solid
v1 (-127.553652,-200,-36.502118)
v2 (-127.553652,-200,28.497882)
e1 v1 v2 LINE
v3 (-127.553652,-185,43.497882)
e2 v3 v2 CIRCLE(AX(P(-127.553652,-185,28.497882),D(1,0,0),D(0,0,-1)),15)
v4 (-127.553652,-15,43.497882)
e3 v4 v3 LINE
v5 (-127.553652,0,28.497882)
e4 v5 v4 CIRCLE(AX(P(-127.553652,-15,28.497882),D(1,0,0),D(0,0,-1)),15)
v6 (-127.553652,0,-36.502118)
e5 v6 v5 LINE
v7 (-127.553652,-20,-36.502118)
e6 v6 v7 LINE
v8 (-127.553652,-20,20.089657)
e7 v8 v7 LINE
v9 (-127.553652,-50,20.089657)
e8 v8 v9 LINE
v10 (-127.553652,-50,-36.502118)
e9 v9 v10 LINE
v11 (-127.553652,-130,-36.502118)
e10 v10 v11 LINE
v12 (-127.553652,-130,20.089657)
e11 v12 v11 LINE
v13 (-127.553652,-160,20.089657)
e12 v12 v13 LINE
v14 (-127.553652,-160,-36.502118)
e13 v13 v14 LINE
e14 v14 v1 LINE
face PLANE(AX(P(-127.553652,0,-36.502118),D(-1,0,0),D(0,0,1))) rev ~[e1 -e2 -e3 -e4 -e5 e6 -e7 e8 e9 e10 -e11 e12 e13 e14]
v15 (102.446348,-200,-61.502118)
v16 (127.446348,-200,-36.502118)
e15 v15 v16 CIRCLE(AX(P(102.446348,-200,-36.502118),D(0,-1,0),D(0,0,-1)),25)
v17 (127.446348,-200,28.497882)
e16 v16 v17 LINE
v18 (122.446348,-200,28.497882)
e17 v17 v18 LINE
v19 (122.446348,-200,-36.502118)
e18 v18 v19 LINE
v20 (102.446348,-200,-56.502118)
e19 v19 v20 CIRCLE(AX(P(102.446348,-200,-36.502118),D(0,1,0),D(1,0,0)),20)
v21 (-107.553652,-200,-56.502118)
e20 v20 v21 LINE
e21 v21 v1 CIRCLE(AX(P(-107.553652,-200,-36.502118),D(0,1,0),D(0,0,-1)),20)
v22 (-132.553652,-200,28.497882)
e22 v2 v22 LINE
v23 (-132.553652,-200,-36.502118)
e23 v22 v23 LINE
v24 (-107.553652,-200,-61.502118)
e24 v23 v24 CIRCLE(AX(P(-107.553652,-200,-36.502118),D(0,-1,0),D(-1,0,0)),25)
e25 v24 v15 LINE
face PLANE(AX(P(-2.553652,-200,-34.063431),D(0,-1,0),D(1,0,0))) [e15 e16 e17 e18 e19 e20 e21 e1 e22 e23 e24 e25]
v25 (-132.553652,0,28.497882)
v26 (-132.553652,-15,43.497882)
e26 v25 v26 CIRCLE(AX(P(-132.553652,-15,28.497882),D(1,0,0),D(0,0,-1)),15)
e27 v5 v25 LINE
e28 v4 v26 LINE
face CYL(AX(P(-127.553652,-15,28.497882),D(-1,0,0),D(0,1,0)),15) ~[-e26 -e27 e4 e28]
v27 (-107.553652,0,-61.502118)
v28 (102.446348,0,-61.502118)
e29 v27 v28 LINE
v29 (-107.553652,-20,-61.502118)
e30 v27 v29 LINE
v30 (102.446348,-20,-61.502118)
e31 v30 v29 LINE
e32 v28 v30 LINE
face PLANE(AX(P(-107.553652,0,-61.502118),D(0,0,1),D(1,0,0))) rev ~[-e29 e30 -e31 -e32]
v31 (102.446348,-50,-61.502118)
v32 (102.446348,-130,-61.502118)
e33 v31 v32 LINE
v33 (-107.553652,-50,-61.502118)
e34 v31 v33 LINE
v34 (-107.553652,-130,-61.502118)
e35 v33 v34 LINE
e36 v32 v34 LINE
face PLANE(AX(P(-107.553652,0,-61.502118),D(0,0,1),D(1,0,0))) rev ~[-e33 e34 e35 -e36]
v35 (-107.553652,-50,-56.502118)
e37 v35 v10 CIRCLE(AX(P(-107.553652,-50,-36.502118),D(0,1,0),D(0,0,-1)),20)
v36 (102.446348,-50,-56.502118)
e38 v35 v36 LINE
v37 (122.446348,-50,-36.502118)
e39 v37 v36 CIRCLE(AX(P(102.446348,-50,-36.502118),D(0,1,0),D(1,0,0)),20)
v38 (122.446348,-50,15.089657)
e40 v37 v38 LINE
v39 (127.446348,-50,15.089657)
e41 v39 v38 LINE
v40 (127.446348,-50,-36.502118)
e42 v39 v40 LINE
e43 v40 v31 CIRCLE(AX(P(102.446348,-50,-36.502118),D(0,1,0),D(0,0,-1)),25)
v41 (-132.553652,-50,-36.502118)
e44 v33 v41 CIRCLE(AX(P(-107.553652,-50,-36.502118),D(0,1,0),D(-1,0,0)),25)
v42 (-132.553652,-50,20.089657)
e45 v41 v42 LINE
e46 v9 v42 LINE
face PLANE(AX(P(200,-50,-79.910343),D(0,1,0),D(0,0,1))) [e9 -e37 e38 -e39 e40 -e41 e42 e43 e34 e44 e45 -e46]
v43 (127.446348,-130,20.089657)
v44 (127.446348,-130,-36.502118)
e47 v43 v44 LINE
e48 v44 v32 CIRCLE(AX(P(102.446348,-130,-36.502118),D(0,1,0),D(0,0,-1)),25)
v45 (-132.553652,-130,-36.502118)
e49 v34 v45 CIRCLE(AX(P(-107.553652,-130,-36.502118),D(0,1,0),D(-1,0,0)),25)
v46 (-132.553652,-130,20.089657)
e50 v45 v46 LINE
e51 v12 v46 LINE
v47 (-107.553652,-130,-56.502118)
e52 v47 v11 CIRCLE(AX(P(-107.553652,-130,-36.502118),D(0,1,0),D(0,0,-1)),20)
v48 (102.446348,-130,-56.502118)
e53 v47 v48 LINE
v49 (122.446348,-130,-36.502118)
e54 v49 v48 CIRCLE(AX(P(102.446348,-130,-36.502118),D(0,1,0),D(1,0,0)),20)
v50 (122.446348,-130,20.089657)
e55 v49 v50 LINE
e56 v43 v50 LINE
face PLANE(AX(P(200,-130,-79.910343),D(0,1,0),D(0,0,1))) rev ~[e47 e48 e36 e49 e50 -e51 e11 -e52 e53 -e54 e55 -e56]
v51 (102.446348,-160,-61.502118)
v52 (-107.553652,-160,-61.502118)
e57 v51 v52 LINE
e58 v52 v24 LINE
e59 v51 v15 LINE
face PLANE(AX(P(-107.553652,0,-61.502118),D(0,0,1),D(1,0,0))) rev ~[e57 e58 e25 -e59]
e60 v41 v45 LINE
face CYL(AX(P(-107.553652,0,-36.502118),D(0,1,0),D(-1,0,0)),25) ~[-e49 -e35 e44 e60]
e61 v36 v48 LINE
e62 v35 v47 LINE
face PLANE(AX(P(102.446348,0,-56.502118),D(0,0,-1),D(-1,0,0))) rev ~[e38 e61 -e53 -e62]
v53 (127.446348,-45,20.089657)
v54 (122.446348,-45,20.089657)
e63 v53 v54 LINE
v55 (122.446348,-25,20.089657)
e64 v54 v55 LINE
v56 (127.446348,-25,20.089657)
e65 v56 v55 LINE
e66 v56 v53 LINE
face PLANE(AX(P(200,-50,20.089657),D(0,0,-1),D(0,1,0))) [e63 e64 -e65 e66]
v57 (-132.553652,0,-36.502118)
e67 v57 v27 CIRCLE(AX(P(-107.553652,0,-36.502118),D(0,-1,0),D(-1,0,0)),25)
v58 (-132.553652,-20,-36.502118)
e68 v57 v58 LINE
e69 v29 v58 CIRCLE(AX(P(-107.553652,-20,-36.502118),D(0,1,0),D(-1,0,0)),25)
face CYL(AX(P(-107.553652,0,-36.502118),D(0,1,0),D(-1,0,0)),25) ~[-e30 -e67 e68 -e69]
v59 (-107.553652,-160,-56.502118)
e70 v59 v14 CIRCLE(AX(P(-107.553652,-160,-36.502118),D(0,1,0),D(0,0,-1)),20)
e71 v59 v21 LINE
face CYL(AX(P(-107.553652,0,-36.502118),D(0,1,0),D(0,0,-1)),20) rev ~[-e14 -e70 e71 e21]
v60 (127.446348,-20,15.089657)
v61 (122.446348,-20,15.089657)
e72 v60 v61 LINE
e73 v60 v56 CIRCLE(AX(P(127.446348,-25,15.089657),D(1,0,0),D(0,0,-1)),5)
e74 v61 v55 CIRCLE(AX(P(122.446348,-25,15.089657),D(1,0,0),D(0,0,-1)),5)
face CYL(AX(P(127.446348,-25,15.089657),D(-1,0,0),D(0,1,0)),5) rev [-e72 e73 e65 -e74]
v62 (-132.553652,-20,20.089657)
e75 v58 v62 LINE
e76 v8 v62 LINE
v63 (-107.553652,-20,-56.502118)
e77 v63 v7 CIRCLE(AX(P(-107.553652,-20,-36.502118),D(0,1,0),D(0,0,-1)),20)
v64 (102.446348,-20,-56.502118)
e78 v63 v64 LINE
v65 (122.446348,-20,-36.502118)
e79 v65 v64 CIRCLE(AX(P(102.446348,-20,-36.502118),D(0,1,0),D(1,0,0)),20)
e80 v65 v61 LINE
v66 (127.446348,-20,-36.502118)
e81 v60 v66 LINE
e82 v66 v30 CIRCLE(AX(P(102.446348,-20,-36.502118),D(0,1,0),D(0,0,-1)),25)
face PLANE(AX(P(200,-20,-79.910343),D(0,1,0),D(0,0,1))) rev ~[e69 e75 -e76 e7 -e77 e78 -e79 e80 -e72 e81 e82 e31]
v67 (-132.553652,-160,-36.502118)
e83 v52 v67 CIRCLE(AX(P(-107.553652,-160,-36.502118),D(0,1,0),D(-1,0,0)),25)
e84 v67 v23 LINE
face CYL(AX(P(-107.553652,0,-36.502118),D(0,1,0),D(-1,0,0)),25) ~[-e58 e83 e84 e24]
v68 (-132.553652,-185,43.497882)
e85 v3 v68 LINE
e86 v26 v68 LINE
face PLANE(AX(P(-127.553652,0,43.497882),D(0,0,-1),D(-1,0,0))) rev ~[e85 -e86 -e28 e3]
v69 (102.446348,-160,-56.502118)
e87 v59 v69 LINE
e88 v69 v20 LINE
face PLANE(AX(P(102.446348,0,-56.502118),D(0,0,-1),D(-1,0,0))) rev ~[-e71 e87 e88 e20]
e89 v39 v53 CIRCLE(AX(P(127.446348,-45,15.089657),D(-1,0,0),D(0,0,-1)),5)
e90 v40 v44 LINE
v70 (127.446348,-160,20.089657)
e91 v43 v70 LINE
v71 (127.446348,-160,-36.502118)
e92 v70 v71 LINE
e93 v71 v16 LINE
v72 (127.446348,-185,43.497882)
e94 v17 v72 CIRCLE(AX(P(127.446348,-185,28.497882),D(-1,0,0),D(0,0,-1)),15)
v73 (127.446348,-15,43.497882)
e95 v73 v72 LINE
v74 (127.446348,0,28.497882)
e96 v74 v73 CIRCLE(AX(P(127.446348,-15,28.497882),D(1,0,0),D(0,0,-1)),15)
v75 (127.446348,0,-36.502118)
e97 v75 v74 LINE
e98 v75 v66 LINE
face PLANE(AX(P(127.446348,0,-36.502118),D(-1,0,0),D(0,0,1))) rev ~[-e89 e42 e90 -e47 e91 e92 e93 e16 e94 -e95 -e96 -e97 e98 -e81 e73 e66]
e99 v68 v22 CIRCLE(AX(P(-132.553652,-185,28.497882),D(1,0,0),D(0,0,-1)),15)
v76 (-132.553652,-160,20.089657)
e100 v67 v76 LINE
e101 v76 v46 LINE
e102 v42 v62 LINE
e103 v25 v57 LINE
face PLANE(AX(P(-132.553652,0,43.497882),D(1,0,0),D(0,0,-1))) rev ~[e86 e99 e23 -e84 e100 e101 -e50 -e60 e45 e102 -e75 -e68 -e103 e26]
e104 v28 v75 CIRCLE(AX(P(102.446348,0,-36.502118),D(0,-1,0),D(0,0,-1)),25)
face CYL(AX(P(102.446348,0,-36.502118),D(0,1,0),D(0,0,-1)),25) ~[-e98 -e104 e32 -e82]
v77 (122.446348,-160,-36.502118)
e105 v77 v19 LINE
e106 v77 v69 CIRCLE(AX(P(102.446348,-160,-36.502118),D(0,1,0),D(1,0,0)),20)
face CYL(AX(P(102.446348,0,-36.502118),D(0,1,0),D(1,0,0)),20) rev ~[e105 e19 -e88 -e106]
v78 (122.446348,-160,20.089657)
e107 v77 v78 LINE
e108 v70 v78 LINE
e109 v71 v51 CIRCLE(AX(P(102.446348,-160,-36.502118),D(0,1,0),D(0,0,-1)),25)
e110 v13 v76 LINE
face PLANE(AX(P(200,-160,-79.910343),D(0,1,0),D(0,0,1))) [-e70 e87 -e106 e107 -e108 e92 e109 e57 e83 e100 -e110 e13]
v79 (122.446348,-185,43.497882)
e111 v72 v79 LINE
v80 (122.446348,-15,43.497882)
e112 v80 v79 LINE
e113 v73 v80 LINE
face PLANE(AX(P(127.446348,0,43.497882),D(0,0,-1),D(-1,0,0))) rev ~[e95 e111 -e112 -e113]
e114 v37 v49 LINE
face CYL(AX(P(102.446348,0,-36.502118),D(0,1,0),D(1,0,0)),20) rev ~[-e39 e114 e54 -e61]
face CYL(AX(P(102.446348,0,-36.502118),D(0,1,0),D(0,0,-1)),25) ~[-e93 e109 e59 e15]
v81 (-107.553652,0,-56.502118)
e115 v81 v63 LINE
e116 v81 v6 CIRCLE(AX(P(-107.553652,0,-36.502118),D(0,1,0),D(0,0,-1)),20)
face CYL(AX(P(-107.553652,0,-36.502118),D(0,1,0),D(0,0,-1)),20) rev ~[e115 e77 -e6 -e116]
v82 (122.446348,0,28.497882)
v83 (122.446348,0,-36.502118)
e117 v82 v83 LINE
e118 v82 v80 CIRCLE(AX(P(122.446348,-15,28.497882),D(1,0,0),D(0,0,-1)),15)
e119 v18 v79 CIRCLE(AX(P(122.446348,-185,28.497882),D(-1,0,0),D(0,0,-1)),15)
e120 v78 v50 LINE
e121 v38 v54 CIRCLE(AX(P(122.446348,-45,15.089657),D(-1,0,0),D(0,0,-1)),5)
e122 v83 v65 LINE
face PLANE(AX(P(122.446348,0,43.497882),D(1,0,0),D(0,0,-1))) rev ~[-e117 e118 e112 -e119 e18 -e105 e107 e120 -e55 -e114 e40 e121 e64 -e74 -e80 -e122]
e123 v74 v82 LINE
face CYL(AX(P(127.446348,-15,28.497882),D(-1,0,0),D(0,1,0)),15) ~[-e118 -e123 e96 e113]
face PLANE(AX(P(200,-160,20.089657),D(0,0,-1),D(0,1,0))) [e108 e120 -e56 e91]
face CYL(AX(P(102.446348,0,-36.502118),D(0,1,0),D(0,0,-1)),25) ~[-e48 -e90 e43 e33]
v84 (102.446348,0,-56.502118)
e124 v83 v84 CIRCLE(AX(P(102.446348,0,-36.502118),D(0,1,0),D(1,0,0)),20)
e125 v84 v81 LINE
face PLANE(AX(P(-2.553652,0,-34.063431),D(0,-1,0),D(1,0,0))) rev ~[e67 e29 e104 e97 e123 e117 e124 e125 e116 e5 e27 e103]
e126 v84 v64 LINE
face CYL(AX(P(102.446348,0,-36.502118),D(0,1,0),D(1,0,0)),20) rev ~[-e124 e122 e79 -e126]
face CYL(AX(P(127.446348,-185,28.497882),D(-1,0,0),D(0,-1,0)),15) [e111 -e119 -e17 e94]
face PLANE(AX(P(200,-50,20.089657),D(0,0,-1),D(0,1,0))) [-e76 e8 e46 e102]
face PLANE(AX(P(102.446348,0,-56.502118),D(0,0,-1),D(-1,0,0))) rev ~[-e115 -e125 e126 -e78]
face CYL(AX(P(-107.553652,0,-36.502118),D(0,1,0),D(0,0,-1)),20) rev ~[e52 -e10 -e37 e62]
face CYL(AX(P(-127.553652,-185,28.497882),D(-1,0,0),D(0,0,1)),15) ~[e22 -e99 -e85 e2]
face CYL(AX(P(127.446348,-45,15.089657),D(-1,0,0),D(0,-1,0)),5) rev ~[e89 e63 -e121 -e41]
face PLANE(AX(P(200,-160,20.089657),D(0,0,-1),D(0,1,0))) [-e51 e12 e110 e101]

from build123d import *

# Parameters (mm, degrees)
F2_DEPTH = 200
F3_W     = 30
F3_H     = 100
F4_DEPTH = 500
F6_R     = 15
F7_R     = 5


with BuildPart() as f2:
    # F0 (on Front) → F2 (new body)
    with BuildSketch(Plane.XZ):
        with BuildLine():
            Line((-127.5536519289, -36.5021181107), (-127.5536519289, 43.4978818893))
            Line((-127.5536519289, 43.4978818893), (-132.5536519289, 43.4978818893))
            Line((-132.5536519289, 43.4978818893), (-132.5536519289, -36.5021181107))
            ThreePointArc((-132.5536519289, -36.5021181107), (-125.2313214586, -54.1797876403), (-107.5536519289, -61.5021181107))
            Line((-107.5536519289, -61.5021181107), (102.4463480711, -61.5021181107))
            ThreePointArc((102.4463480711, -61.5021181107), (120.1240176008, -54.1797876403), (127.4463480711, -36.5021181107))
            Line((127.4463480711, -36.5021181107), (127.4463480711, 43.4978818893))
            Line((127.4463480711, 43.4978818893), (122.4463480711, 43.4978818893))
            Line((122.4463480711, 43.4978818893), (122.4463480711, -36.5021181107))
            ThreePointArc((122.4463480711, -36.5021181107), (116.5884836948, -50.6442537344), (102.4463480711, -56.5021181107))
            Line((102.4463480711, -56.5021181107), (-107.5536519289, -56.5021181107))
            ThreePointArc((-107.5536519289, -56.5021181107), (-121.6957875526, -50.6442537344), (-127.5536519289, -36.5021181107))
        make_face()
    extrude(amount=F2_DEPTH)


with BuildPart() as f4:
    # F3 (on offset) → F4 (new body)
    with BuildSketch(Plane.YZ.offset(200)):
        with Locations((-145, -29.9103426556)):
            Rectangle(F3_W, F3_H)
    extrude(amount=-F4_DEPTH)


with BuildPart() as f4b:
    # F3 (on offset) → F4, piece 2 (new body)
    with BuildSketch(Plane.YZ.offset(200)):
        with Locations((-35, -29.9103426556)):
            Rectangle(F3_W, F3_H)
    extrude(amount=-F4_DEPTH)


with BuildPart() as f2_1:
    add(f2.part)

    # F5: cut F4, F4b
    add(f4.part, mode=Mode.SUBTRACT)
    add(f4b.part, mode=Mode.SUBTRACT)

    # F6
    f6_edges = [f2_1.edges().sort_by_distance(p)[0] for p in [
        (-130.053652, -200, 43.497882),
        (-130.053652, 0, 43.497882),
        (124.946348, -200, 43.497882),
        (124.946348, 0, 43.497882),
    ]]
    fillet(f6_edges, radius=F6_R)

    # F7
    f7_edges = [f2_1.edges().sort_by_distance(p)[0] for p in [
        (124.946348, -20, 20.089657),
        (124.946348, -50, 20.089657),
    ]]
    fillet(f7_edges, radius=F7_R)


solid = f2_1.part
